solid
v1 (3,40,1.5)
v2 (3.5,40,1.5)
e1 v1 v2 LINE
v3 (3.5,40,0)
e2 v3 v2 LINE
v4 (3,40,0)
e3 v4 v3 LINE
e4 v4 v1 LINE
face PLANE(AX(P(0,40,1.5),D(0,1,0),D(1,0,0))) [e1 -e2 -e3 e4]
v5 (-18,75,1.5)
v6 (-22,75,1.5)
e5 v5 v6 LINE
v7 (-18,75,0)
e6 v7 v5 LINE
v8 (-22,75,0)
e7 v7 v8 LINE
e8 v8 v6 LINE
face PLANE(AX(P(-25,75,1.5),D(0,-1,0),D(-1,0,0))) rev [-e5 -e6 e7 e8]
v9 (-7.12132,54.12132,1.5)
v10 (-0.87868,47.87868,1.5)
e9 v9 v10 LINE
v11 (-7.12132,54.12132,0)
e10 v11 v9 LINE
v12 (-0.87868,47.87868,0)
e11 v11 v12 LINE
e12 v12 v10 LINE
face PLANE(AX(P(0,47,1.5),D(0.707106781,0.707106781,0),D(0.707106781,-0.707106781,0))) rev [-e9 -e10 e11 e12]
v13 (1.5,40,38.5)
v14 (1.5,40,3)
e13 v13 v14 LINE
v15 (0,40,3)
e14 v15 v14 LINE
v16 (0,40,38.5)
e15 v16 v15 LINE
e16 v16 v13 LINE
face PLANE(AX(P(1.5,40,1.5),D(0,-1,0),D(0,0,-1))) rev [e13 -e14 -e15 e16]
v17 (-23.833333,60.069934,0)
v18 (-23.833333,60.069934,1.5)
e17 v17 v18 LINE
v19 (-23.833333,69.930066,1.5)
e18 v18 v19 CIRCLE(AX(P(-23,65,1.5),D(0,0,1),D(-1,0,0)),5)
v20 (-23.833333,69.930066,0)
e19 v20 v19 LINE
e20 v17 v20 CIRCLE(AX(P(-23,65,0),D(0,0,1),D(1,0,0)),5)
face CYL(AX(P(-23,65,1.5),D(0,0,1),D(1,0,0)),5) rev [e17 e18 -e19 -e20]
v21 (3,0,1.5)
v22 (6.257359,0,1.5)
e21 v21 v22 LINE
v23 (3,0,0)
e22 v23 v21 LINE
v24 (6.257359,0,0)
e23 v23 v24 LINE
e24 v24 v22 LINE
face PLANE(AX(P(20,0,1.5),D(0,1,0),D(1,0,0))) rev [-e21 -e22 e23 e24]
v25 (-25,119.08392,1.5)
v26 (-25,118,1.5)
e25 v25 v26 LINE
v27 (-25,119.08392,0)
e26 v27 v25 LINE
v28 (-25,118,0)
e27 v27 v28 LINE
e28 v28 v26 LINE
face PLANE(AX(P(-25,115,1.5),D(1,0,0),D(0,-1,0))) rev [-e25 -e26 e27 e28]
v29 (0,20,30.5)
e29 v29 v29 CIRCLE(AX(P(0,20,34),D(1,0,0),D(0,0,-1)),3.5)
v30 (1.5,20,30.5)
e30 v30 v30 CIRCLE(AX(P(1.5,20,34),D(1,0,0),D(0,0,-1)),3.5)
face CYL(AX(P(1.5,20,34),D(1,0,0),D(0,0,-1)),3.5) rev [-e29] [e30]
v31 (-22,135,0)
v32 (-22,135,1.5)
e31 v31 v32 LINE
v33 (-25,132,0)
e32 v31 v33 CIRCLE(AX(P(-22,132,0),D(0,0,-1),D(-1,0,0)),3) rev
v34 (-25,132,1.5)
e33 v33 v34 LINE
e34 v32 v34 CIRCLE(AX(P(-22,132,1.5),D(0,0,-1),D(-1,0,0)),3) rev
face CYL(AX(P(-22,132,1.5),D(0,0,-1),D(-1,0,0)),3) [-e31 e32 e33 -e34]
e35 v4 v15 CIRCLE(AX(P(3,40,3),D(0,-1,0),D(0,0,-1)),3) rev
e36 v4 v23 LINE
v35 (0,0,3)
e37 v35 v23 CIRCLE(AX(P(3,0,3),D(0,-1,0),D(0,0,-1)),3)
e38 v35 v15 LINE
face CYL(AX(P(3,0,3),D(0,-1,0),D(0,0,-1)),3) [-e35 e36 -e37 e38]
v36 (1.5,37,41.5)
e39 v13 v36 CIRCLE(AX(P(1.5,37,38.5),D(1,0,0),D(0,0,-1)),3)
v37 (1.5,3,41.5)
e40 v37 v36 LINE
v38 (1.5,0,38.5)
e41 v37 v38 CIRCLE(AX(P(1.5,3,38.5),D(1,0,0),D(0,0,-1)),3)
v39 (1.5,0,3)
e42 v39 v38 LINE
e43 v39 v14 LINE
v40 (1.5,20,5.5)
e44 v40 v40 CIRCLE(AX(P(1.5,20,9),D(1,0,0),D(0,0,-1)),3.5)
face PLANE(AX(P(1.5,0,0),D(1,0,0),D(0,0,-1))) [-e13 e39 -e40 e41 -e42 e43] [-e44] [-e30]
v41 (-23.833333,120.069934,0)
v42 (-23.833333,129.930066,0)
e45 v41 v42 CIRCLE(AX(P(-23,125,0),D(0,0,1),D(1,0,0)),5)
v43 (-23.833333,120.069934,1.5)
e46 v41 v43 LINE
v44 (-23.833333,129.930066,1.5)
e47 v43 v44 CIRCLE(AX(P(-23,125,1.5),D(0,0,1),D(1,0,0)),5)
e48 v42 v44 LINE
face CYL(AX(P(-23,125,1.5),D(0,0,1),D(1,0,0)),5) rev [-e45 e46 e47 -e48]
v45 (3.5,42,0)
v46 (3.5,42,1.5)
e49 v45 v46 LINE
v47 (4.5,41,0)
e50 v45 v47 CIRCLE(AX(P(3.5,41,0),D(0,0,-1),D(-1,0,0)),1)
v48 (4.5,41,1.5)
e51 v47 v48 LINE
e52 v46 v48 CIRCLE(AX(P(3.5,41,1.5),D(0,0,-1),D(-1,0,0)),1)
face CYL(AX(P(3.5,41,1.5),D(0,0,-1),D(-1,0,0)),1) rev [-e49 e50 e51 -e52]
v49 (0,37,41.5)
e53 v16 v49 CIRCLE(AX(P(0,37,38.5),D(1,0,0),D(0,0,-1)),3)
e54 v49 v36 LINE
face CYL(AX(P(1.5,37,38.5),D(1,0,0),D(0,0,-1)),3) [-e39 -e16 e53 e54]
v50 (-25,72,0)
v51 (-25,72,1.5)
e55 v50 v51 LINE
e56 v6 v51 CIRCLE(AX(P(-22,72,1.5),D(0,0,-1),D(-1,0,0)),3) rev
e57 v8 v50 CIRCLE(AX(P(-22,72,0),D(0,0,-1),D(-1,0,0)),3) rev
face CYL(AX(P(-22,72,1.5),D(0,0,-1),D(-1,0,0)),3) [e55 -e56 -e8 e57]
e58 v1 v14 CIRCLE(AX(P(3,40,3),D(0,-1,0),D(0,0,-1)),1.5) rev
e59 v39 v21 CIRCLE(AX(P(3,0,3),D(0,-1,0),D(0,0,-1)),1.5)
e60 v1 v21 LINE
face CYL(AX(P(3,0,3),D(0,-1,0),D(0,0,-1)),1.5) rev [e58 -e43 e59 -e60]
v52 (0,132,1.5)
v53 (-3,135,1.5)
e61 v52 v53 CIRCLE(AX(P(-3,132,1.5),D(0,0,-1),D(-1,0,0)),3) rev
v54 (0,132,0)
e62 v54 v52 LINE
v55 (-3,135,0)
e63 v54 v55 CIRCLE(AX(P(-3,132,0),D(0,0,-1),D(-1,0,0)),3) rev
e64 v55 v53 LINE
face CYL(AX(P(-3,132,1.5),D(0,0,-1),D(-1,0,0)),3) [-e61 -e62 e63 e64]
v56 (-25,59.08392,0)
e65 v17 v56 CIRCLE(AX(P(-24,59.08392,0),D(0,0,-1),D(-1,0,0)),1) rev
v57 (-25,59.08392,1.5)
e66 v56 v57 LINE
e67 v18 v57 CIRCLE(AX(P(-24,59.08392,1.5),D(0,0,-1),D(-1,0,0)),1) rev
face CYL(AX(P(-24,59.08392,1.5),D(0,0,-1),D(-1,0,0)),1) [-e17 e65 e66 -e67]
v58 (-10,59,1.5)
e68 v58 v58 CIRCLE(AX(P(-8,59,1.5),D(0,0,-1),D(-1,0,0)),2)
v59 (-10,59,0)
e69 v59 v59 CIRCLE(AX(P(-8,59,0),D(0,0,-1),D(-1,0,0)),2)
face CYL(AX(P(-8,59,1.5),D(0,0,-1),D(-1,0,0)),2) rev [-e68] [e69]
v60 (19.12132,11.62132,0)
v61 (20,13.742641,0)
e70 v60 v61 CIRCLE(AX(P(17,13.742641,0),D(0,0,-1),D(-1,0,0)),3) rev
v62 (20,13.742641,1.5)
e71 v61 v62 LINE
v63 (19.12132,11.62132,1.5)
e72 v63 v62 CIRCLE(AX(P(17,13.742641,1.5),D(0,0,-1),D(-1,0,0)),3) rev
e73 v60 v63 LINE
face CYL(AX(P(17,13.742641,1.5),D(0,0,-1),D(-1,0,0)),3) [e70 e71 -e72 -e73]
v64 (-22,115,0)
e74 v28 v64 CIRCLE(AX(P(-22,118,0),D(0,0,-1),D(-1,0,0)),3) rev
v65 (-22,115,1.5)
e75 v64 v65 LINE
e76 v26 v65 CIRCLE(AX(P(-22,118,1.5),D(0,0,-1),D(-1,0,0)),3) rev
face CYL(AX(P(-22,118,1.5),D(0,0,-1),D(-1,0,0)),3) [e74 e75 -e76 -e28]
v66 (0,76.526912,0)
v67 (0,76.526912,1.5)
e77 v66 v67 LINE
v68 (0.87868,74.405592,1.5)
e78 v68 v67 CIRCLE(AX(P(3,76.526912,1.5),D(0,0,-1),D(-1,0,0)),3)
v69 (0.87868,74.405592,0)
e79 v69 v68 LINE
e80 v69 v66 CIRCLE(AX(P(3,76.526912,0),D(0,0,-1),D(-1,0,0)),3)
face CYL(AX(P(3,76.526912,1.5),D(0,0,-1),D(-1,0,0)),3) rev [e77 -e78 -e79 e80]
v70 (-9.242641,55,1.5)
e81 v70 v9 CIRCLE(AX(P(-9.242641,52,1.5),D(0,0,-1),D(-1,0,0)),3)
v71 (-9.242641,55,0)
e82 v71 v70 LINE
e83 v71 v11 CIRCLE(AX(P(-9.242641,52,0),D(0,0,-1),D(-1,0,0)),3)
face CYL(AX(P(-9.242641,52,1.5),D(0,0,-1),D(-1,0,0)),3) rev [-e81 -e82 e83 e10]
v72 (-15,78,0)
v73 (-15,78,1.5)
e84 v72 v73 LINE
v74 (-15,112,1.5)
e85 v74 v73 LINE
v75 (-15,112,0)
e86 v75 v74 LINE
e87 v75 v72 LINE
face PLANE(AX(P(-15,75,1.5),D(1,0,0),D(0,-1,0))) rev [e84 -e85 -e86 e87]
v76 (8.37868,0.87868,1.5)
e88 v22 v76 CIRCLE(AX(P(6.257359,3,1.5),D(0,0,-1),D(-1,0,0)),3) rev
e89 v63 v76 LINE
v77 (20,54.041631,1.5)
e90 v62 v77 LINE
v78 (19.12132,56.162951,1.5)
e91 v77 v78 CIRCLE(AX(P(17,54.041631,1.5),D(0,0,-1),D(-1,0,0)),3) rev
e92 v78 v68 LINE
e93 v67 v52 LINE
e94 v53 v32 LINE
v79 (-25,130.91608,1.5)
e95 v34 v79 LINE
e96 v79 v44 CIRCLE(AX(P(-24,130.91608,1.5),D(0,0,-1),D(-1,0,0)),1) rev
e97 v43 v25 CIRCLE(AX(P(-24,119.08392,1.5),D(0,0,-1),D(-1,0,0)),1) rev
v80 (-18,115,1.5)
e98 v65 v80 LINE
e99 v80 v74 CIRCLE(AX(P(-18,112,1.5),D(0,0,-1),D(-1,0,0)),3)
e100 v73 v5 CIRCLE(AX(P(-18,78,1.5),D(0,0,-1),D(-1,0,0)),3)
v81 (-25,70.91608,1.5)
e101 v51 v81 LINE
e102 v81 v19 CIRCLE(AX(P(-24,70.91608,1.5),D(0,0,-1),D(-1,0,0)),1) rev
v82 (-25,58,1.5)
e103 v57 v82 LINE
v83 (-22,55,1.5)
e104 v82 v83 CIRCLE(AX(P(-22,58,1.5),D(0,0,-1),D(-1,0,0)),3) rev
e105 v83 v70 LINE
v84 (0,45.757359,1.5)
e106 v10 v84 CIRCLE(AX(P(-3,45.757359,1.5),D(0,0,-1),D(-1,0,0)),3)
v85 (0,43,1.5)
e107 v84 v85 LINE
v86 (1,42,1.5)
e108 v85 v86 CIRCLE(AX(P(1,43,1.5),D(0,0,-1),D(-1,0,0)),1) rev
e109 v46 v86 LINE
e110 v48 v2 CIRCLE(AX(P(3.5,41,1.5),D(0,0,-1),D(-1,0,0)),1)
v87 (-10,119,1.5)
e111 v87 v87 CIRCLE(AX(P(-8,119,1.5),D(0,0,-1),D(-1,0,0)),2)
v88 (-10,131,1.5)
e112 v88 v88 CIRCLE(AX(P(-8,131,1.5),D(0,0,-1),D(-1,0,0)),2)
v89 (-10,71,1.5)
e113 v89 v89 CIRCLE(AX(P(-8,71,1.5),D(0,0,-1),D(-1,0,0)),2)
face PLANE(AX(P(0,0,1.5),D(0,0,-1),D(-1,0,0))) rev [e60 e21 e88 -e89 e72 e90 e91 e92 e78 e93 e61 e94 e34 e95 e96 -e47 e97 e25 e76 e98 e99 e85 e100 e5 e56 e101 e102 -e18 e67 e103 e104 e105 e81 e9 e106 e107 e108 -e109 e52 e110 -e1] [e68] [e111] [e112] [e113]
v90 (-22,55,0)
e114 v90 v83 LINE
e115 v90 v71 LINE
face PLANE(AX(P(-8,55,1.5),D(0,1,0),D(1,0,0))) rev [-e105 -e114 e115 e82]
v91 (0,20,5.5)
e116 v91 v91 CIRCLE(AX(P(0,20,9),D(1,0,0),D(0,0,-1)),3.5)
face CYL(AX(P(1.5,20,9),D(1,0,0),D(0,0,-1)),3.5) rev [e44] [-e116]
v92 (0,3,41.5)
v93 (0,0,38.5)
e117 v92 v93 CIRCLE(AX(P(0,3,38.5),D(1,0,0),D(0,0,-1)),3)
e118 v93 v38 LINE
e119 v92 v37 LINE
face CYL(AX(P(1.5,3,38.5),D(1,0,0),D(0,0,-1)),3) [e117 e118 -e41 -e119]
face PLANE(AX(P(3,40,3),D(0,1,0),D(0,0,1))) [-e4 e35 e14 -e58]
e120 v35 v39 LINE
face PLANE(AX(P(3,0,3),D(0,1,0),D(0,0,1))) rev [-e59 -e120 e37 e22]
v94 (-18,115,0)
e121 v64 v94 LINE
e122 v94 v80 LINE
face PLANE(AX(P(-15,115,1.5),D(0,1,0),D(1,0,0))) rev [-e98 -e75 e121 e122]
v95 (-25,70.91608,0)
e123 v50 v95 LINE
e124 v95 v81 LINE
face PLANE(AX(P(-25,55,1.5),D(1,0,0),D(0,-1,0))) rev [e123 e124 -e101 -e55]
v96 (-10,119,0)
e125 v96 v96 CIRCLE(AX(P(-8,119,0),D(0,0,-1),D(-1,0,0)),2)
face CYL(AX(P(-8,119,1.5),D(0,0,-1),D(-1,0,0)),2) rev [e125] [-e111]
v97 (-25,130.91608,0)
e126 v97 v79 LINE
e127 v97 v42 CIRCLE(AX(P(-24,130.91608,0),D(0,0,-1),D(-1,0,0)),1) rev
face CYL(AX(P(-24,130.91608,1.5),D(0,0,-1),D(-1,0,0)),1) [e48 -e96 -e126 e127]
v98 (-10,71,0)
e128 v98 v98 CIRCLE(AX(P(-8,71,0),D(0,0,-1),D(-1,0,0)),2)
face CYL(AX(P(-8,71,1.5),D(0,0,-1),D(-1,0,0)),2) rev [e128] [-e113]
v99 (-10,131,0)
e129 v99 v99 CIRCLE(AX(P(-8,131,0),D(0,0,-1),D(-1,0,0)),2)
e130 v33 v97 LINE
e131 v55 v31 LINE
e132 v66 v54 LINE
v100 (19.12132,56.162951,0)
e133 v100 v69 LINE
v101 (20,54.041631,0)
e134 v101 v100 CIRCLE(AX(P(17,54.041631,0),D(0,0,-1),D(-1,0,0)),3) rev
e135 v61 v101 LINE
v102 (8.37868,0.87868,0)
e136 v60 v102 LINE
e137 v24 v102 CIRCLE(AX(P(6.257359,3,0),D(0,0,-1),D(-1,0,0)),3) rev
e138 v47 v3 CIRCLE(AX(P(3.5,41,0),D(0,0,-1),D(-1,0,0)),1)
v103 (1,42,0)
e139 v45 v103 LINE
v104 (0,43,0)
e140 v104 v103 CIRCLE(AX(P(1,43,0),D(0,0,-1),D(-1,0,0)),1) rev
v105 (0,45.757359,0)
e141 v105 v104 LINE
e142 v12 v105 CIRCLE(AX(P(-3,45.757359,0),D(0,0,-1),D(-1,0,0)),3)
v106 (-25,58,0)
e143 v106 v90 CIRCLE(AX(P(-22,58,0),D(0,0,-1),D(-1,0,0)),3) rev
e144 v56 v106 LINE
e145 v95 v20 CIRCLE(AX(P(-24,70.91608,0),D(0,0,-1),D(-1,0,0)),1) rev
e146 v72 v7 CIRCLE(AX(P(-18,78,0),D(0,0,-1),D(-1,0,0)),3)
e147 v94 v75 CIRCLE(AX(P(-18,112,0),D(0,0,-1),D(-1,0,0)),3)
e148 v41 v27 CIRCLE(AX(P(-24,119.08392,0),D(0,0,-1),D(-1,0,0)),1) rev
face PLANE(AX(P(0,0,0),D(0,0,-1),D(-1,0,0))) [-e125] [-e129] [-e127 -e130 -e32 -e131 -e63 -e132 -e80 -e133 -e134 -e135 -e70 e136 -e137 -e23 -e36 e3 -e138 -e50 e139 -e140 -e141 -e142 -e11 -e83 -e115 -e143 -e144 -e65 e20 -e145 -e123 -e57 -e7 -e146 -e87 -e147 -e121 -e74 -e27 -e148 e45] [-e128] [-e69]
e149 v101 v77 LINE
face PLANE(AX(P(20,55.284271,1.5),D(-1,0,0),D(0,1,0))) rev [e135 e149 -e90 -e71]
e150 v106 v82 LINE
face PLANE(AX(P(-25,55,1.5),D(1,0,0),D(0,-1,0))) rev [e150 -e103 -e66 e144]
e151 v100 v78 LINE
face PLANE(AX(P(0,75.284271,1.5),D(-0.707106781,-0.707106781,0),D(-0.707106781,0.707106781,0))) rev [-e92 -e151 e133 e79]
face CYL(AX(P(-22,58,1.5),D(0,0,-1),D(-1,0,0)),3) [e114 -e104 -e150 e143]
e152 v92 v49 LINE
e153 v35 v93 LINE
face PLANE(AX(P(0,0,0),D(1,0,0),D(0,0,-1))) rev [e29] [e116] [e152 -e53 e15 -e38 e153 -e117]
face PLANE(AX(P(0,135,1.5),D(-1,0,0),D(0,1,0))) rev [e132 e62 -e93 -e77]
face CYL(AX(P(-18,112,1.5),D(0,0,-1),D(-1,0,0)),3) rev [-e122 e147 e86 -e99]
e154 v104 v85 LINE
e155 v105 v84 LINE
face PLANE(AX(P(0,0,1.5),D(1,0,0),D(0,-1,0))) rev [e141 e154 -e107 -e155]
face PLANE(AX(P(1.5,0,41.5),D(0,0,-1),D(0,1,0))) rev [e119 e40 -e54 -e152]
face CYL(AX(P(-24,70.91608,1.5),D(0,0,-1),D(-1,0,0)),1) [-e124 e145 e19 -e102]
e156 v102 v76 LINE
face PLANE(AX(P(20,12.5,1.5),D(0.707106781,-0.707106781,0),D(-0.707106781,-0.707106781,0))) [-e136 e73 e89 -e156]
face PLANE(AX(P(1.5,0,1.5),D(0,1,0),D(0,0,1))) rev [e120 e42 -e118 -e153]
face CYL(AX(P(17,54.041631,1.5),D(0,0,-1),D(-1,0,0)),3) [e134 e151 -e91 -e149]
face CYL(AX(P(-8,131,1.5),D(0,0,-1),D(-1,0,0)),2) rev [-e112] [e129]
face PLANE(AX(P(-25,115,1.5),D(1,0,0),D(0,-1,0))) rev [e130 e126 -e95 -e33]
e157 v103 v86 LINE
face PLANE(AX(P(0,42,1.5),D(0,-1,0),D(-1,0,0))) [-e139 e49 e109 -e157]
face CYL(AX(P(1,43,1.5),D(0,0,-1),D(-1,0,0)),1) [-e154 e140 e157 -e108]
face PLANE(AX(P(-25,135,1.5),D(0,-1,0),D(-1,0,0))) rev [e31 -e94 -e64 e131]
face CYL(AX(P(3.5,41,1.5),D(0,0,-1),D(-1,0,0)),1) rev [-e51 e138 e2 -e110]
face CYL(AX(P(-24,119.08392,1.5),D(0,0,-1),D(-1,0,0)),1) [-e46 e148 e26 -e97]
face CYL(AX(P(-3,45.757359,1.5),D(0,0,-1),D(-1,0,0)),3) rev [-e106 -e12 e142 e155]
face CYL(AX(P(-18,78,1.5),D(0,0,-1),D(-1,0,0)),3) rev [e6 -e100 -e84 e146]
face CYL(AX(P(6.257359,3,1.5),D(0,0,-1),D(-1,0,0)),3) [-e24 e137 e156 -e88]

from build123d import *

# Parameters (mm, degrees)
BOSS_EXTRU_1_DEPTH           = 1.5
ENL_V_MAT_EXTRU_1_DEPTH      = 138.30349595
ESQUISSE3_W                  = 40
ESQUISSE3_H                  = 40
BOSS_EXTRU_2_DEPTH           = 1.5
ESQUISSE4_W                  = 4.5
ESQUISSE4_H                  = 2
ENL_V_MAT_EXTRU_2_DEPTH      = 1.5
ENL_V_MAT_EXTRU_5_DEPTH      = 144.003496461
CONG_1_R                     = 1
CONG_2_R                     = 3
ENL_V_MAT_EXTRU_3_DEPTH      = 144.699338899
ENL_V_MAT_EXTRU_3_DEPTH_BACK = 144.699338899
ESQUISSE9_R                  = 3.5
ENL_V_MAT_EXTRU_4_DEPTH      = 144.003496461
ENL_V_MAT_EXTRU_4_DEPTH_BACK = 144.003496461
ESQUISSE10_R                 = 2
CONVERTIR_VOLUME1_DEPTH      = 40
CONVERTIR_VOLUME1_2_DEPTH    = 40


# Read off the part's stored shape, not the designer's step: Convertir-Volume1
with BuildPart() as part:
    # Esquisse1 → Boss.-Extru.1 (new body)
    with BuildSketch(Plane.XY):
        Polygon((0, 0), (0, 47), (-8, 55), (-25, 55), (-25, 75), (-15, 75), (-15, 115), (-25, 115), (-25, 135), (0, 135), (0, 75.284271247), (20, 55.284271247), (20, 0), align=None)
    extrude(amount=BOSS_EXTRU_1_DEPTH)

    # Esquisse2 → Enlèv. mat.-Extru.1 (cut, through all)
    with BuildSketch(Plane.XY.offset(1.5)):
        with BuildLine():
            Line((-25, 69.582575695), (-25, 60.417424305))
            ThreePointArc((-25, 60.417424305), (-18, 65), (-25, 69.582575695))
        make_face()
        with BuildLine():
            Line((-25, 120.417424305), (-25, 129.582575695))
            ThreePointArc((-25, 129.582575695), (-18, 125), (-25, 120.417424305))
        make_face()
    extrude(amount=-ENL_V_MAT_EXTRU_1_DEPTH, mode=Mode.SUBTRACT)

    # Esquisse3 → Boss.-Extru.2 (add)
    with BuildSketch(Plane.ZY):
        with Locations((21.5, 20)):
            Rectangle(ESQUISSE3_W, ESQUISSE3_H)
    extrude(amount=-BOSS_EXTRU_2_DEPTH)

    # Esquisse4 → Enlèv. mat.-Extru.2 (cut)
    with BuildSketch(Plane.XY.offset(1.5)):
        with Locations((2.25, 41)):
            Rectangle(ESQUISSE4_W, ESQUISSE4_H)
    extrude(amount=-ENL_V_MAT_EXTRU_2_DEPTH, mode=Mode.SUBTRACT)

    # Esquisse11 → Enlèv. mat.-Extru.5 (cut, through all)
    with BuildSketch(Plane.XY.offset(1.5)):
        Polygon((20, 12.5), (7.5, 0), (20, 0), align=None)
    extrude(amount=-ENL_V_MAT_EXTRU_5_DEPTH, mode=Mode.SUBTRACT)

    # Congé1
    cong_1_edges = [part.edges().sort_by_distance(p)[0] for p in [
        (-25, 129.582575695, 0.75),
        (-25, 120.417424305, 0.75),
        (-25, 69.582575695, 0.75),
        (-25, 60.417424305, 0.75),
        (0, 42, 0.75),
        (4.5, 42, 0.75),
        (4.5, 40, 0.75),
    ]]
    fillet(cong_1_edges, radius=CONG_1_R - 0.0001)  # a hair under: the kernel refuses the full size

    # Congé2
    cong_2_edges = [part.edges().sort_by_distance(p)[0] for p in [
        (0, 47, 0.75),
        (-8, 55, 0.75),
        (-25, 55, 0.75),
        (-25, 75, 0.75),
        (-15, 75, 0.75),
        (-15, 115, 0.75),
        (-25, 115, 0.75),
        (-25, 135, 0.75),
        (0, 135, 0.75),
        (0, 75.284271247, 0.75),
        (20, 55.284271247, 0.75),
        (0.75, 40, 41.5),
        (0.75, 0, 41.5),
        (20, 12.5, 0.75),
        (7.5, 0, 0.75),
    ]]
    fillet(cong_2_edges, radius=CONG_2_R)

    # Esquisse9 → Enlèv. mat.-Extru.3 (cut, two sides: drawn at the far end of the back side and taken through both)
    with BuildSketch(Plane(origin=(1.5, 0, 0), x_dir=(0, 0, -1), z_dir=(1, 0, 0)).offset(-ENL_V_MAT_EXTRU_3_DEPTH_BACK)):
        with Locations((-34, 20)):
            Circle(ESQUISSE9_R)
        with Locations((-9, 20)):
            Circle(ESQUISSE9_R)
    extrude(amount=ENL_V_MAT_EXTRU_3_DEPTH + ENL_V_MAT_EXTRU_3_DEPTH_BACK, mode=Mode.SUBTRACT)

    # Esquisse10 → Enlèv. mat.-Extru.4 (cut, two sides: drawn at the far end of the back side and taken through both)
    with BuildSketch(Plane.XY.offset(1.5).offset(-ENL_V_MAT_EXTRU_4_DEPTH_BACK)):
        with Locations((-8, 59)):
            Circle(ESQUISSE10_R)
        with Locations(Location((-8, 71, 0), (0, 0, 180))):
            Circle(ESQUISSE10_R)
        with Locations((-8, 119)):
            Circle(ESQUISSE10_R)
        with Locations(Location((-8, 131, 0), (0, 0, 180))):
            Circle(ESQUISSE10_R)
    extrude(amount=ENL_V_MAT_EXTRU_4_DEPTH + ENL_V_MAT_EXTRU_4_DEPTH_BACK, mode=Mode.SUBTRACT)

    # Convertir-Volume1 outline → Convertir-Volume1 (cut)
    with BuildSketch(Plane(origin=(0, 0, 0), x_dir=(1, 0, 0), z_dir=(0, 1, 0))):
        with BuildLine():
            ThreePointArc((0, -3), (0.878679656, -0.878679656), (3, 0))
            Line((3, 0), (0, 0))
            Line((0, 0), (0, -3))
        make_face()
    extrude(amount=CONVERTIR_VOLUME1_DEPTH, mode=Mode.SUBTRACT)

    # Convertir-Volume1 2 outline → Convertir-Volume1 2 (add)
    with BuildSketch(Plane(origin=(0, 0, 0), x_dir=(1, 0, 0), z_dir=(0, 1, 0))):
        with BuildLine():
            Line((1.5, -1.5), (1.5, -3))
            ThreePointArc((1.5, -3), (1.939339828, -1.939339828), (3, -1.5))
            Line((3, -1.5), (1.5, -1.5))
        make_face()
    extrude(amount=CONVERTIR_VOLUME1_2_DEPTH)


solid = part.part
